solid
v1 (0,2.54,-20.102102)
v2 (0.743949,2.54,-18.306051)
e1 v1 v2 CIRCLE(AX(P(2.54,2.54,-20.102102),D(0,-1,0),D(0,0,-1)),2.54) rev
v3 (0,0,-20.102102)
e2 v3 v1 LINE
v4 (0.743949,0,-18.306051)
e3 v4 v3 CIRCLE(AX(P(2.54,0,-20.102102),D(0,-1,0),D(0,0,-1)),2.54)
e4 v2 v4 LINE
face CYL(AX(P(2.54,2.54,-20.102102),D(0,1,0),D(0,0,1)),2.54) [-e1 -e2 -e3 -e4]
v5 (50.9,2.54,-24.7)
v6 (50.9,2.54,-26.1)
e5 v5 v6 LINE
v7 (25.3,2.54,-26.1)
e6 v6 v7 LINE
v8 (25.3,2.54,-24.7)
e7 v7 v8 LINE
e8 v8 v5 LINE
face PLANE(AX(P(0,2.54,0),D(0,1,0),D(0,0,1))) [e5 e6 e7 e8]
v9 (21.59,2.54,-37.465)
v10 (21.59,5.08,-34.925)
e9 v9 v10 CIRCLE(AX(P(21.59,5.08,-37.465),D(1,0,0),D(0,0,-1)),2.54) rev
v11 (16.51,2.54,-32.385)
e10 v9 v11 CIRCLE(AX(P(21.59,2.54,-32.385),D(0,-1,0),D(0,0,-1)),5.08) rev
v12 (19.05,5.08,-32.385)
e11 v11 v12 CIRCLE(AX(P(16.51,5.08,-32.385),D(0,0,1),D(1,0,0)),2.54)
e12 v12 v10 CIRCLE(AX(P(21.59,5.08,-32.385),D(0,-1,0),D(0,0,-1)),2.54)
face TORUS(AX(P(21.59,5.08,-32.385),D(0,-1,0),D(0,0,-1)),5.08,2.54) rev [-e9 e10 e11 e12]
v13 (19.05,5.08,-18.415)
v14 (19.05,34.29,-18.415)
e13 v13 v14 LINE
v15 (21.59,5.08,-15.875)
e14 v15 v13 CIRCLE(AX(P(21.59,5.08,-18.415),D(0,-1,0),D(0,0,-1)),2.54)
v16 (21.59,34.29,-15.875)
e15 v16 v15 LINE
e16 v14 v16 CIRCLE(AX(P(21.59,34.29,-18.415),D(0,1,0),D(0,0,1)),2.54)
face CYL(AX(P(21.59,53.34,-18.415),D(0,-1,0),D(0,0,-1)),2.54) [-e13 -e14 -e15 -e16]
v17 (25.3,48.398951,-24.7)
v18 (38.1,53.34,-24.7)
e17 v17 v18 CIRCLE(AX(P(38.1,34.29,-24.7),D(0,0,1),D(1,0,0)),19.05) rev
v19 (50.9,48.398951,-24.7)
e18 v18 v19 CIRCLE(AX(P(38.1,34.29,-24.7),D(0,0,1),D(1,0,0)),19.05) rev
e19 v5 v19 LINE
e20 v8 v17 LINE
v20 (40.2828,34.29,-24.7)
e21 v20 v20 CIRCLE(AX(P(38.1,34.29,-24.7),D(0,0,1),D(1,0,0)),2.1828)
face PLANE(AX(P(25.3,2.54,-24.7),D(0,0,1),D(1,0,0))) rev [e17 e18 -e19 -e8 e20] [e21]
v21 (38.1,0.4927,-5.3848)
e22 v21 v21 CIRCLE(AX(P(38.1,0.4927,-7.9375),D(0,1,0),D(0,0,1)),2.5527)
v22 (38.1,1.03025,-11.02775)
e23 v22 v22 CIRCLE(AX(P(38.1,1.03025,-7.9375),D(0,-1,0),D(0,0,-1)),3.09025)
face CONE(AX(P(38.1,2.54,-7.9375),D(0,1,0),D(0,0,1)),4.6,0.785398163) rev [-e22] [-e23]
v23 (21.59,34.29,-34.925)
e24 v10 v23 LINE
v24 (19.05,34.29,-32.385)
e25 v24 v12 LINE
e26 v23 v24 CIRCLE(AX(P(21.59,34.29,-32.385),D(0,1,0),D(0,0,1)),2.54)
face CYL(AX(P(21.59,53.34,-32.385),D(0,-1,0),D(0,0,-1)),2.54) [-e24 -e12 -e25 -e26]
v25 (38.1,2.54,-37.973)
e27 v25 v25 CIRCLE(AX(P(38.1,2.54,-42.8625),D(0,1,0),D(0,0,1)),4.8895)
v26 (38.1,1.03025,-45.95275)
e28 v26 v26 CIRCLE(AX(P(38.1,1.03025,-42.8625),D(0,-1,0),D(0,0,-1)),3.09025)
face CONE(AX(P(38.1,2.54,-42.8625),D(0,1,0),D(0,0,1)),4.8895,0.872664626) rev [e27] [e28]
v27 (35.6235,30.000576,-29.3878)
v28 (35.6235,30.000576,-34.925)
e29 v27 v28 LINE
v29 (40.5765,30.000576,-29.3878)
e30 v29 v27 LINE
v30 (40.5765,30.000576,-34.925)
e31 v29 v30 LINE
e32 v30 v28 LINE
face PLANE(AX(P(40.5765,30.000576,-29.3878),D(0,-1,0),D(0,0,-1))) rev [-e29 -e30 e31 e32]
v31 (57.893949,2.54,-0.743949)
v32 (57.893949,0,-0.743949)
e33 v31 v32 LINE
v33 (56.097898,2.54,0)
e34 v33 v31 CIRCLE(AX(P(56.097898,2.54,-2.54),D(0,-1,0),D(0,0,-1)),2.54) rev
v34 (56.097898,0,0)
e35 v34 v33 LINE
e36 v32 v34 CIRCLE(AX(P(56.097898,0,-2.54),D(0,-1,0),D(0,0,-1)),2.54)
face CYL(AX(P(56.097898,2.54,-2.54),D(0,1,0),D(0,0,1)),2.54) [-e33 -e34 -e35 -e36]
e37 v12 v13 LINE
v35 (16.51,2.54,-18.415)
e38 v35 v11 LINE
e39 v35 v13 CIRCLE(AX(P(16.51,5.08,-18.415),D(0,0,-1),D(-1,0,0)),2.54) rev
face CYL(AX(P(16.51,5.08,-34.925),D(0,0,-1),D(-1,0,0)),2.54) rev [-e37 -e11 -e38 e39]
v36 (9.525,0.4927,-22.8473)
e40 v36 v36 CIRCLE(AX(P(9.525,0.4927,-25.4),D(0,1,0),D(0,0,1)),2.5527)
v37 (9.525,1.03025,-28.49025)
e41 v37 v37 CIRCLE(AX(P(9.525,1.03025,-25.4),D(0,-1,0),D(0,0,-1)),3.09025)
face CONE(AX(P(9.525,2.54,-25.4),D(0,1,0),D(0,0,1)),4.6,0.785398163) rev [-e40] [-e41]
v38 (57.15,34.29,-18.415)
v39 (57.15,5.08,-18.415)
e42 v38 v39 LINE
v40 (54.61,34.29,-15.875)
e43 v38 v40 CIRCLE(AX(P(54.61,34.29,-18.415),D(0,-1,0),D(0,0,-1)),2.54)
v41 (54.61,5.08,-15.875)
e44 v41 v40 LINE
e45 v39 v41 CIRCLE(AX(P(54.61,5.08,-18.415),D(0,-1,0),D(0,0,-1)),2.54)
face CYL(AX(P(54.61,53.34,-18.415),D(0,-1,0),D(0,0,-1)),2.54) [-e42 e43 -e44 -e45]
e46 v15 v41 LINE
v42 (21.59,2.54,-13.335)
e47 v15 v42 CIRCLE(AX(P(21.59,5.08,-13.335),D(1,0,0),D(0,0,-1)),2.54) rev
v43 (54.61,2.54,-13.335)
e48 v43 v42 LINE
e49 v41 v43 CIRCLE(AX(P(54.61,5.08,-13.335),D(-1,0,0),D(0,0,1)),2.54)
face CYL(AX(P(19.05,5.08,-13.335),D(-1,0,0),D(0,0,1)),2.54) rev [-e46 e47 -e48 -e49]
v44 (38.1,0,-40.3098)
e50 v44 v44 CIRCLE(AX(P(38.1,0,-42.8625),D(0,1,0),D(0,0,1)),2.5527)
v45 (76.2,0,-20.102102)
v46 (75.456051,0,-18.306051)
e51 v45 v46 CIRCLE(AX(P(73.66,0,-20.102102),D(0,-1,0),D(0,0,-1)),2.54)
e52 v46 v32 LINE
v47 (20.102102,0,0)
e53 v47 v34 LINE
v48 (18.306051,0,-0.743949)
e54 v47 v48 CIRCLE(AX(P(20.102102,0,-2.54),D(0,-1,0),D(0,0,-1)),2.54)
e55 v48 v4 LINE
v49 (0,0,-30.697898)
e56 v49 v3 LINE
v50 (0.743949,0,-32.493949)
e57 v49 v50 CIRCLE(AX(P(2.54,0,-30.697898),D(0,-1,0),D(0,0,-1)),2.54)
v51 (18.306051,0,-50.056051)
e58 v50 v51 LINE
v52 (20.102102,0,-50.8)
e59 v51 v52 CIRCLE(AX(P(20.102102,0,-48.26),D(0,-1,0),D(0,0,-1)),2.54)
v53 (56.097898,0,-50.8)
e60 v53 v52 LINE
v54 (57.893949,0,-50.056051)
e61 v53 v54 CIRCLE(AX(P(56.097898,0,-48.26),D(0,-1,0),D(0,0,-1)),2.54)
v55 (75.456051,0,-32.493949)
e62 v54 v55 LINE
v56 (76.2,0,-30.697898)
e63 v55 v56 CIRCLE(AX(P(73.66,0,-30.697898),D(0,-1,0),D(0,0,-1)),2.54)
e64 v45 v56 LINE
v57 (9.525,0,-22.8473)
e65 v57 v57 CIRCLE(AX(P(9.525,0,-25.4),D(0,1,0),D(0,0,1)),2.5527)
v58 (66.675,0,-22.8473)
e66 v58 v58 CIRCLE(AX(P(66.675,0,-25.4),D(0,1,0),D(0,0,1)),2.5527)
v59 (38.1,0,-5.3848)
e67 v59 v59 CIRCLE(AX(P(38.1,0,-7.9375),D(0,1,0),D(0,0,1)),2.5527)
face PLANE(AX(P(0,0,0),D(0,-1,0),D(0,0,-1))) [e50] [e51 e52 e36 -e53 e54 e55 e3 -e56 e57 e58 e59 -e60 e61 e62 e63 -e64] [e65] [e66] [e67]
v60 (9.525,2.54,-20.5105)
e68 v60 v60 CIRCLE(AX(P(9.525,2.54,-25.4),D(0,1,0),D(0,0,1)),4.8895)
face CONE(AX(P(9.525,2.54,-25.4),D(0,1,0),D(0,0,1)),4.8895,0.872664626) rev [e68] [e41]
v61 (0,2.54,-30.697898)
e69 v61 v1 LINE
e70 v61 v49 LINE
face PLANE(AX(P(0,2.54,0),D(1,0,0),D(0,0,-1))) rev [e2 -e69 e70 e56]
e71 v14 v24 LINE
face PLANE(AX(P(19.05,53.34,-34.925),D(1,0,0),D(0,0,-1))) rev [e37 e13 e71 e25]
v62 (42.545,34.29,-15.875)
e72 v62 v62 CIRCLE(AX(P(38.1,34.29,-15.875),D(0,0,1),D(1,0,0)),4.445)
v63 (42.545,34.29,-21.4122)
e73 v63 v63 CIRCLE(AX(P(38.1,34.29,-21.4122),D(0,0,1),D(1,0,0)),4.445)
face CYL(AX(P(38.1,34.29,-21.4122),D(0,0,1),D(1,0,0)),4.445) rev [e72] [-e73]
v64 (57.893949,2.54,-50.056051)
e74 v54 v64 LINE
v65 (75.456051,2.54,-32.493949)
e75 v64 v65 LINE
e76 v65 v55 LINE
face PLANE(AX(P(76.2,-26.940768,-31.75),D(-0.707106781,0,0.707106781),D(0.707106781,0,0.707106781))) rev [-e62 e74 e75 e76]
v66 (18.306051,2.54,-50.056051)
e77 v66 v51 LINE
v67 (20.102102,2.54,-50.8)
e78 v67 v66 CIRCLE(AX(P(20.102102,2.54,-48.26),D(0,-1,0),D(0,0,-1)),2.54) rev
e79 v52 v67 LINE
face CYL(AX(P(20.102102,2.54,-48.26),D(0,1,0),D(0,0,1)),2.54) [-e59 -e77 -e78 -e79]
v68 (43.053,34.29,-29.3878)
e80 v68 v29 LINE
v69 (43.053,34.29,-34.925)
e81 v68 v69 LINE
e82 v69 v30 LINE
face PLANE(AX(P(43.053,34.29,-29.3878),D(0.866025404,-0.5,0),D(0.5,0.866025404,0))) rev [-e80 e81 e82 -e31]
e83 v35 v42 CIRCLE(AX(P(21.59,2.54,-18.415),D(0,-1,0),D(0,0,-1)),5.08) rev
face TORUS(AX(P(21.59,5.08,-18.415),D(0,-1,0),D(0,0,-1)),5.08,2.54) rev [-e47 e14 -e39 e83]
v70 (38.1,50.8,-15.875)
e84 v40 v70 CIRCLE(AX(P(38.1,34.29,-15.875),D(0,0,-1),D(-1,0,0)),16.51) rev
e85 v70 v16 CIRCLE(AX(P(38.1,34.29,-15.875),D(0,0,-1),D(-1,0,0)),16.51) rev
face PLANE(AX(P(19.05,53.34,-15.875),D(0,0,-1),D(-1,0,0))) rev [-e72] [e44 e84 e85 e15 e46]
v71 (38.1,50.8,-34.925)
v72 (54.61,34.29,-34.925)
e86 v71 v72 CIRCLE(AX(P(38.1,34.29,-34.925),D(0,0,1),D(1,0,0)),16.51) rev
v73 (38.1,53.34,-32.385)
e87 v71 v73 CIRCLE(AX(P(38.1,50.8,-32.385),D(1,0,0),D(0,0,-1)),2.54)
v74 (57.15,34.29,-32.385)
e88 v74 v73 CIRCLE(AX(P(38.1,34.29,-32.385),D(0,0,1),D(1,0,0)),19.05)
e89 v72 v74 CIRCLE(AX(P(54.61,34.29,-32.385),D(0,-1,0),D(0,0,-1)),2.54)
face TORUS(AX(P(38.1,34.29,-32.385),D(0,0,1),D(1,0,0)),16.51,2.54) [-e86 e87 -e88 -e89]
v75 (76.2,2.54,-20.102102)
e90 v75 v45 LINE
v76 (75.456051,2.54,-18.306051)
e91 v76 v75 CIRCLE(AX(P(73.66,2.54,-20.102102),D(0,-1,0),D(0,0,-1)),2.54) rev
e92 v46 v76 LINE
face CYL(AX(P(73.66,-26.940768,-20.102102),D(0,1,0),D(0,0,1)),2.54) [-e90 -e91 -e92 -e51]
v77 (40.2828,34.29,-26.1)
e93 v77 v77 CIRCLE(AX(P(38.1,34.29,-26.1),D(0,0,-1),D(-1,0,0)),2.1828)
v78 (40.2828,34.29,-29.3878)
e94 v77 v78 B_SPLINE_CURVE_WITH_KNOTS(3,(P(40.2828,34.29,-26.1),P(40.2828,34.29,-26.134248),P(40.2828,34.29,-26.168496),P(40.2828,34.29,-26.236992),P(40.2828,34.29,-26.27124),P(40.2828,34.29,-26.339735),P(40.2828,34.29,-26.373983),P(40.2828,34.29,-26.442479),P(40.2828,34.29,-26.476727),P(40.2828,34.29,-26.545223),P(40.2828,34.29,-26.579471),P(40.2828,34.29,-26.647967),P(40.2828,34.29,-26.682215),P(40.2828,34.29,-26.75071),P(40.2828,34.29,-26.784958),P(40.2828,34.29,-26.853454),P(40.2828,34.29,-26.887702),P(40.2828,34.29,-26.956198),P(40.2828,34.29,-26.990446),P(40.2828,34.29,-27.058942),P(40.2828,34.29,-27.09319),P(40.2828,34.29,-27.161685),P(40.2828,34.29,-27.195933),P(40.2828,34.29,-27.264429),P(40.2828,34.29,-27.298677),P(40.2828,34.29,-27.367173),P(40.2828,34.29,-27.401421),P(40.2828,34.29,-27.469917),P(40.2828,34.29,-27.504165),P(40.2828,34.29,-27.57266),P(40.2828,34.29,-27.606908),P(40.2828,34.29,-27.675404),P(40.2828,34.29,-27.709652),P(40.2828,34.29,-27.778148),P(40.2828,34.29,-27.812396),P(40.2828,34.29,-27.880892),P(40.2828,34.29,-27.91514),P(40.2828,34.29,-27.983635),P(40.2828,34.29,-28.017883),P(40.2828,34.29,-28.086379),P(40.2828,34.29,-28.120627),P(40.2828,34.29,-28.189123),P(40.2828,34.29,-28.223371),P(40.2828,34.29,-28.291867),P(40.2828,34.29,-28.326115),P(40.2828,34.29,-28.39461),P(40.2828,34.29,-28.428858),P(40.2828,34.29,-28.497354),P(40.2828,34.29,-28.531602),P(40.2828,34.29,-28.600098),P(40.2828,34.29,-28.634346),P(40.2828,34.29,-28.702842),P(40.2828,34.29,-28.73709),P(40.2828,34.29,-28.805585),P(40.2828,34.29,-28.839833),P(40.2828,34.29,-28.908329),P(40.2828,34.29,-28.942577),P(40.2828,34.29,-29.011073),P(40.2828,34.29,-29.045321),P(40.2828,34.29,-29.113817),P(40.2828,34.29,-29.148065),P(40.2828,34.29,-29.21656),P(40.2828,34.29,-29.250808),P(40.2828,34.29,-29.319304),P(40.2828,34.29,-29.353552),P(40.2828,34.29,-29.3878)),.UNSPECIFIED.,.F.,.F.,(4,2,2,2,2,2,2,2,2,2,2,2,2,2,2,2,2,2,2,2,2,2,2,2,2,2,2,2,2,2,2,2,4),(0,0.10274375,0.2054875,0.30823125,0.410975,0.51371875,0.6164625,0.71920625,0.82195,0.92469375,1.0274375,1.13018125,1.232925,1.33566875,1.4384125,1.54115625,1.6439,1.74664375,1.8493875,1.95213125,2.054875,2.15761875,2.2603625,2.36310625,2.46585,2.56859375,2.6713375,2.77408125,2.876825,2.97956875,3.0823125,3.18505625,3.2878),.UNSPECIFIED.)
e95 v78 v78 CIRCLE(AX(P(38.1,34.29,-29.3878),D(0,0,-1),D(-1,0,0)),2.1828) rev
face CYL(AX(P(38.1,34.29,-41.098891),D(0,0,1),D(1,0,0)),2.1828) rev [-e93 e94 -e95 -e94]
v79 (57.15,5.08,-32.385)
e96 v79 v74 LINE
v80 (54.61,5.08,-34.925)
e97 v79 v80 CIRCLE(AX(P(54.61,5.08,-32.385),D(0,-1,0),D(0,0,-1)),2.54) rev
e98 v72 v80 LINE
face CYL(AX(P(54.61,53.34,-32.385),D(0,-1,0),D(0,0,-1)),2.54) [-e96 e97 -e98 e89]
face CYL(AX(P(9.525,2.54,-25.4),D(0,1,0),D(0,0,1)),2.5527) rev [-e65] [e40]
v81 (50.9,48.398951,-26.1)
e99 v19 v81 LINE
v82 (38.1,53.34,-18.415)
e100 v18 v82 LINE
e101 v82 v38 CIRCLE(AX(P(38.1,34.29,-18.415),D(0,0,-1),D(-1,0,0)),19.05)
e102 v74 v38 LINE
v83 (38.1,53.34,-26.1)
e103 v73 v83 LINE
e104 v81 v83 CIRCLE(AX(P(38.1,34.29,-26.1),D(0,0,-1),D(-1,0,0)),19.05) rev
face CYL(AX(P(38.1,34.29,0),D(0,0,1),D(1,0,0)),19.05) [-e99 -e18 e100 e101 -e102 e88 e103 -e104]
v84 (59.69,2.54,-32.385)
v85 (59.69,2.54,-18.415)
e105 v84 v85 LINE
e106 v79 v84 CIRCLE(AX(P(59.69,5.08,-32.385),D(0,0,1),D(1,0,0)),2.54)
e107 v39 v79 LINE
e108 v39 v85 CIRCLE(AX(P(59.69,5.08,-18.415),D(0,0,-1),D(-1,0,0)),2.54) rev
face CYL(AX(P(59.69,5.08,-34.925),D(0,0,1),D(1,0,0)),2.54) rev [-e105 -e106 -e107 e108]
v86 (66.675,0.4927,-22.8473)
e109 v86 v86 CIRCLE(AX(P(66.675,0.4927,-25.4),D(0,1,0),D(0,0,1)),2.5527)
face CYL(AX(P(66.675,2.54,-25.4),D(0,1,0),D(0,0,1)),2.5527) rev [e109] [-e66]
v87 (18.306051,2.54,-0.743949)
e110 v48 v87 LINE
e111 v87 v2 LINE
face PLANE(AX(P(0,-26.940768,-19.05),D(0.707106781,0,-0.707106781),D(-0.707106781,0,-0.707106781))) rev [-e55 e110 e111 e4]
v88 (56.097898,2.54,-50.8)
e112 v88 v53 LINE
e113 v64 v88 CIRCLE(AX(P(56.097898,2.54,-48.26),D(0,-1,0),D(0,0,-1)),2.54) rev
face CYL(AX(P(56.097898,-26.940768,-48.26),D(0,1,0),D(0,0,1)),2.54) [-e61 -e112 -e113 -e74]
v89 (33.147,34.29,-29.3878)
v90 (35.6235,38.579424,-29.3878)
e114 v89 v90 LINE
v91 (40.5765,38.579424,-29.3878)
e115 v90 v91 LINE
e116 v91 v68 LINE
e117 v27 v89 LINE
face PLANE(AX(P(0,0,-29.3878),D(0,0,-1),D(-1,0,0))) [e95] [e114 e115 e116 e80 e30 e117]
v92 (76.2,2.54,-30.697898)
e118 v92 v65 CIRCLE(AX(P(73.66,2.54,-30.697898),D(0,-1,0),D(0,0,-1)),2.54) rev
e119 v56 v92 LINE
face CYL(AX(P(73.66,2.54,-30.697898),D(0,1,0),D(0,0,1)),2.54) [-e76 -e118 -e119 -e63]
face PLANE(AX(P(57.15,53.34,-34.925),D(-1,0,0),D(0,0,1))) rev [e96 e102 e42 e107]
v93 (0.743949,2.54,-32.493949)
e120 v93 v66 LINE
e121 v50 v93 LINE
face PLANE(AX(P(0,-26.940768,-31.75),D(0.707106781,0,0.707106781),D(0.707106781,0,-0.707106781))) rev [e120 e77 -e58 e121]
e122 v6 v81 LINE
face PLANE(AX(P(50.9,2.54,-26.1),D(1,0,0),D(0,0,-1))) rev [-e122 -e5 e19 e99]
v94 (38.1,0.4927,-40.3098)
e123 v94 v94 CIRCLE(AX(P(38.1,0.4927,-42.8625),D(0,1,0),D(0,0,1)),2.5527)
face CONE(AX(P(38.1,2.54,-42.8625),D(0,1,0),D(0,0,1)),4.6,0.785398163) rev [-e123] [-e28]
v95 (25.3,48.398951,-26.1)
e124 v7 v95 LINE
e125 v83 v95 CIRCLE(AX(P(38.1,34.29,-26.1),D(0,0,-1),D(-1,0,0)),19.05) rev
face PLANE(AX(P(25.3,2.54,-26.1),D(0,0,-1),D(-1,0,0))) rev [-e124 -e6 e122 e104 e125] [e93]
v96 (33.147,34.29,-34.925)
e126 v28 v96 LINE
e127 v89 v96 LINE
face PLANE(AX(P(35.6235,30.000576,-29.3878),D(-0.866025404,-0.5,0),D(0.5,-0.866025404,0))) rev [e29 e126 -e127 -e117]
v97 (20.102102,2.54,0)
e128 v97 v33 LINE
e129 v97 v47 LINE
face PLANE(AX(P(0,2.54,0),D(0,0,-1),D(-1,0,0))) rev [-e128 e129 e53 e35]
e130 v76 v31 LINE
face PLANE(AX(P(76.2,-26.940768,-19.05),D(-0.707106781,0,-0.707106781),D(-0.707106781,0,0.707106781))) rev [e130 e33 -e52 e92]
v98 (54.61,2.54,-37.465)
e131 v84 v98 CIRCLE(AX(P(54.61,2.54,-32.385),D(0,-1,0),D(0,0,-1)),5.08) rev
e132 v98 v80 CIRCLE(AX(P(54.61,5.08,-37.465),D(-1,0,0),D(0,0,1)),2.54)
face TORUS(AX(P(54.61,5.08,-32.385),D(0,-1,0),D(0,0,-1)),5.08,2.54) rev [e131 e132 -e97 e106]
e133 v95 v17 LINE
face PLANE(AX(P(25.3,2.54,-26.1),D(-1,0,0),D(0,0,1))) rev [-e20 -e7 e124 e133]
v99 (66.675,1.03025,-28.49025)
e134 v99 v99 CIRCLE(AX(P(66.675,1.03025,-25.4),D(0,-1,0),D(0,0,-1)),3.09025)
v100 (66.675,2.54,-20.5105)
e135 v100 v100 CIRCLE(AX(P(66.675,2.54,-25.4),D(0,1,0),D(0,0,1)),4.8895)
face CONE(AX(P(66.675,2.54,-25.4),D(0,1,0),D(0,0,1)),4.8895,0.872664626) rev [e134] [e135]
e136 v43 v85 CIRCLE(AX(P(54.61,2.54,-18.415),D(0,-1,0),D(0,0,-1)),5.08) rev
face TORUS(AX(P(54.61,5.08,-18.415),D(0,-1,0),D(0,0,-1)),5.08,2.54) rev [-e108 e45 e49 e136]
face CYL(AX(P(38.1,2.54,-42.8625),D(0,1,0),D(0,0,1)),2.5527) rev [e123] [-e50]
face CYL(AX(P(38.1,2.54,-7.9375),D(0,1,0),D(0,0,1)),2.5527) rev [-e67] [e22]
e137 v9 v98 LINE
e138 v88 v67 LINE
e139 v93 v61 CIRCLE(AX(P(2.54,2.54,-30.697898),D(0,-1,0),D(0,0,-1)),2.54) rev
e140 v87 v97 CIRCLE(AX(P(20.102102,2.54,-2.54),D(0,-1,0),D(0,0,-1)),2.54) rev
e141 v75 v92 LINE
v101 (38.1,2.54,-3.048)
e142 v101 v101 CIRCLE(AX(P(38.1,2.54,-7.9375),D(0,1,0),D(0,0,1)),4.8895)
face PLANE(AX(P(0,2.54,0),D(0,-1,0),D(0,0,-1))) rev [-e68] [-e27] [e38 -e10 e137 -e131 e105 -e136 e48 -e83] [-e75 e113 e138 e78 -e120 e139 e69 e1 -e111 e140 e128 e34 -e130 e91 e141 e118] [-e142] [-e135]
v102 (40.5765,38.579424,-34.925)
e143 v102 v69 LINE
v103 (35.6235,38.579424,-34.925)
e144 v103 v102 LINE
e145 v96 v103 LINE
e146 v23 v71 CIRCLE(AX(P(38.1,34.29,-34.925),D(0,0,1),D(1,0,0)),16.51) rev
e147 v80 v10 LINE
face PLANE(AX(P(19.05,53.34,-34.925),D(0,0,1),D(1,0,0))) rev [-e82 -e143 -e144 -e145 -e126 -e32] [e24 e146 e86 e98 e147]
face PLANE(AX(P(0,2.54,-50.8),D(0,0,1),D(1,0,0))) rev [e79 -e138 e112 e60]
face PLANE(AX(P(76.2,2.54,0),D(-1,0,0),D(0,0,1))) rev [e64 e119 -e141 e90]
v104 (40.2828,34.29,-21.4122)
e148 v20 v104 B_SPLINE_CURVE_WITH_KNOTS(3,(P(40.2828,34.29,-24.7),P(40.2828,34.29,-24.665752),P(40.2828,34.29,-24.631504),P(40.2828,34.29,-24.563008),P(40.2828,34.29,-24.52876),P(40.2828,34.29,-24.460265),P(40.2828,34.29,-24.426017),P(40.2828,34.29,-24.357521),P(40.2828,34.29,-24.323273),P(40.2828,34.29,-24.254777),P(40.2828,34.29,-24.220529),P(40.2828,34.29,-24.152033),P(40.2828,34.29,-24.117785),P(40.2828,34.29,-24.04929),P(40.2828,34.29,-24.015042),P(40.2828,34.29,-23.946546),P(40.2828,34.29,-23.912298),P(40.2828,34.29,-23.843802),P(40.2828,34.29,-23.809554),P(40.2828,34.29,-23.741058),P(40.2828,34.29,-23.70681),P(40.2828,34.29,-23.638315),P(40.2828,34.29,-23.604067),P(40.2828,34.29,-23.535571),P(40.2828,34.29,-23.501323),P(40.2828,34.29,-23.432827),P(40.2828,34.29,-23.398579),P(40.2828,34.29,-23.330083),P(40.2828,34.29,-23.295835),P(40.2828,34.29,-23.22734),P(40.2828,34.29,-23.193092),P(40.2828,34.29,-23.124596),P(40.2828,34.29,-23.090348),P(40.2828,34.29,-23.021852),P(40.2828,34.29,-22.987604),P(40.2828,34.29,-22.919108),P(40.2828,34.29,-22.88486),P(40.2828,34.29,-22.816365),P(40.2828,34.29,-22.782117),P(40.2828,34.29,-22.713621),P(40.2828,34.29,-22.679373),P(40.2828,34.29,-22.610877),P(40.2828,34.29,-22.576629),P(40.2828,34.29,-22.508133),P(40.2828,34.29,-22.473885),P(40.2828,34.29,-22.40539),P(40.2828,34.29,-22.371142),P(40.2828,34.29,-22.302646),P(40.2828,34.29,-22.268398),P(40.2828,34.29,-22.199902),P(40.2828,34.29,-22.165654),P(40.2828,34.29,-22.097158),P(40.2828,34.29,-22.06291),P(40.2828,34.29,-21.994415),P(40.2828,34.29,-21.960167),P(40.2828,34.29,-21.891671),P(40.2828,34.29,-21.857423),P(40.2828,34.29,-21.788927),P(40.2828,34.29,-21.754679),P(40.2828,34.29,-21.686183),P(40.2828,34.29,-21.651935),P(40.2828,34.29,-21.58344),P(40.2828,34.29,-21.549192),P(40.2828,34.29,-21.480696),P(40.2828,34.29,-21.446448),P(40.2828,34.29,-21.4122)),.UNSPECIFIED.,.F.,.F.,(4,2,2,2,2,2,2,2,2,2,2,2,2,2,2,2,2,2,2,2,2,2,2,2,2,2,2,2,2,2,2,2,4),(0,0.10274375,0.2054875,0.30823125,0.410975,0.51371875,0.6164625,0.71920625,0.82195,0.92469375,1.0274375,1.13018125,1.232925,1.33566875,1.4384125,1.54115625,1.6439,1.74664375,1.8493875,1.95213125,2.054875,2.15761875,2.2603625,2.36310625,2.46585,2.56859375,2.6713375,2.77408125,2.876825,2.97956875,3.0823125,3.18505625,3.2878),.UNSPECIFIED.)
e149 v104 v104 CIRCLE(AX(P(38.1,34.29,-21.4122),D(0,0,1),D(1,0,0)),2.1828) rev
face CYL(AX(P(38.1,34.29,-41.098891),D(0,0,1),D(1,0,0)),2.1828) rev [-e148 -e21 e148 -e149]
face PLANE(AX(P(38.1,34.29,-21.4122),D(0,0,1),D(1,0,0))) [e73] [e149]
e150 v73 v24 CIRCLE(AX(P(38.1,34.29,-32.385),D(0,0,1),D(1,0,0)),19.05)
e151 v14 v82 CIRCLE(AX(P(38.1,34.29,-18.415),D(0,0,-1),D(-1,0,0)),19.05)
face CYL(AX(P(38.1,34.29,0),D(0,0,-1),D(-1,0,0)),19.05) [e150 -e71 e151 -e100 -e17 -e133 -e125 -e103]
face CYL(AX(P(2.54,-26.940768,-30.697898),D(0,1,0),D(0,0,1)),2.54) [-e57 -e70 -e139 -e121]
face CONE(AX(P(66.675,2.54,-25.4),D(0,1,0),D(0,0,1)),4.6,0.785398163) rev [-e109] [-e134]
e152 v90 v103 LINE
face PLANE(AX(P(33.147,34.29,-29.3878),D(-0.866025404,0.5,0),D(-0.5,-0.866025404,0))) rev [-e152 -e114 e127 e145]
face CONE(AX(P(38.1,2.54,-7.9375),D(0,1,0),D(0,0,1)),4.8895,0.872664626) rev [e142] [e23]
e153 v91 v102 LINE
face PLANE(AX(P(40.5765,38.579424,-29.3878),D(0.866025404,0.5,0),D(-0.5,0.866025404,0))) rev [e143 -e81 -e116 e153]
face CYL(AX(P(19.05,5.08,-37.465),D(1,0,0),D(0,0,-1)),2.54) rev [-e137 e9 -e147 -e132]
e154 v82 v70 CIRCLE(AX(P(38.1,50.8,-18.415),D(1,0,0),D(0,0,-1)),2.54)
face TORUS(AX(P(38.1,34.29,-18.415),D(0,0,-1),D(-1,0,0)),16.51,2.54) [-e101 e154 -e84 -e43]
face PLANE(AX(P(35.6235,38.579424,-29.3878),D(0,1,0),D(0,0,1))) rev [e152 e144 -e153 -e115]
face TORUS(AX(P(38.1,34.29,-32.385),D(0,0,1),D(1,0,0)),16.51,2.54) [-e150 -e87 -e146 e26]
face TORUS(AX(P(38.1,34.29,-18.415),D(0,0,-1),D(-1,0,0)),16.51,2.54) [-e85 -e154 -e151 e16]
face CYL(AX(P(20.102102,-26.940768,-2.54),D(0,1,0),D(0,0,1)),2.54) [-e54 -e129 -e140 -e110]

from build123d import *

# Parameters (mm, degrees)
MAIN_BASE_DIM_W                            = 76.2
MAIN_BASE_DIM_H                            = 50.8
MAIN_BASE_DEPTH                            = 2.54
LINKAGE_HOLDER_DIM_W                       = 38.1
LINKAGE_HOLDER_DIM_H                       = 19.05
LINKAGE_HOLDER_DEPTH                       = 50.8
LINKAGE_SLOT_DIM_W                         = 25.6
LINKAGE_SLOT_DIM_H                         = 1.4
LINKAGE_SLOT_DEPTH                         = 50.8
F_75IN_FILLET_R                            = 19.05
BOLT_HOLE_REACH                            = 101.355
BOLT_HOLE_DIM_R                            = 2.1828
BOLT_HEAD_DIM_R                            = 4.445
BOLT_HEAD_DEPTH                            = 5.5372
NUT_SLOT_DEPTH                             = 5.5372
CSK_FOR_10_FLAT_HEAD_MACHINE_SCREW_2_COUNT = 2
CSK_FOR_10_FLAT_HEAD_MACHINE_SCREW_2_PITCH = 33.488349187
CSK_FOR_10_FLAT_HEAD_MACHINE_SCREW_3_COUNT = 2
CSK_FOR_10_FLAT_HEAD_MACHINE_SCREW_3_PITCH = 57.15
CSK_FOR_10_FLAT_HEAD_MACHINE_SCREW_4_COUNT = 2
CSK_FOR_10_FLAT_HEAD_MACHINE_SCREW_4_PITCH = 33.488349187
CORNER_CUT_DEPTH                           = 2.54
F_1IN_FILLET_R                             = 2.54


with BuildPart() as part:
    # Main_Base_Dim → Main_Base (new body)
    with BuildSketch(Plane(origin=(0, 0, 0), x_dir=(1, 0, 0), z_dir=(0, 1, 0))):
        with Locations((38.1, 25.4)):
            Rectangle(MAIN_BASE_DIM_W, MAIN_BASE_DIM_H)
    extrude(amount=MAIN_BASE_DEPTH)

    # Linkage_Holder_Dim → Linkage_Holder (add)
    with BuildSketch(Plane(origin=(0, 2.54, 0), x_dir=(1, 0, 0), z_dir=(0, 1, 0))):
        with Locations((38.1, 25.4)):
            Rectangle(LINKAGE_HOLDER_DIM_W, LINKAGE_HOLDER_DIM_H)
    extrude(amount=LINKAGE_HOLDER_DEPTH)

    # Linkage_Slot_Dim → Linkage_Slot (cut)
    with BuildSketch(Plane(origin=(0, 53.34, 0), x_dir=(1, 0, 0), z_dir=(0, 1, 0))):
        with Locations((38.1, 25.4)):
            Rectangle(LINKAGE_SLOT_DIM_W, LINKAGE_SLOT_DIM_H)
    extrude(amount=-LINKAGE_SLOT_DEPTH, mode=Mode.SUBTRACT)

    # .75in_Fillet
    # the kernel refuses this fillet: 19.05 mm, written as the material it takes off along each edge
    with BuildSketch(Plane(origin=(57.15, 53.34, -82.55), x_dir=(0, -1, 0), z_dir=(0, 0, 1)), Plane(origin=(19.05, 53.34, 31.75), x_dir=(0, -1, 0), z_dir=(0, 0, -1))) as f_75in_fillet_piece_1:
        with BuildLine():
            CenterArc((F_75IN_FILLET_R, -F_75IN_FILLET_R), F_75IN_FILLET_R, 90, 90)
            Line((0, -F_75IN_FILLET_R), (0, 0))
            Line((0, 0), (F_75IN_FILLET_R, 0))
        make_face()
    extrude(amount=114.3, mode=Mode.SUBTRACT)

    # Bolt_Hole: up to this face of the body (flat: up to its plane)
    bolt_hole_end = Plane(part.part.faces().sort_by_distance((38.1, 26.089428348, -34.925))[0])
    # Bolt_Hole_Dim → Bolt_Hole (cut, up to the picked face)
    with BuildSketch(Plane.XY.offset(-15.875), mode=Mode.PRIVATE) as bolt_hole_sk1:
        with Locations((38.1, 34.29)):
            Circle(BOLT_HOLE_DIM_R)
    bolt_hole_tool1 = split(extrude(bolt_hole_sk1.sketch, amount=-BOLT_HOLE_REACH, mode=Mode.PRIVATE), bisect_by=bolt_hole_end, keep=Keep.BOTH, mode=Mode.PRIVATE)
    add(bolt_hole_tool1.solids().sort_by(Axis((38.1, 34.29, -15.875), (0, 0, -1)))[0], mode=Mode.SUBTRACT)

    # Bolt_Head_Dim → Bolt_Head (cut)
    with BuildSketch(Plane.XY.offset(-15.875)):
        with Locations((38.1, 34.29)):
            Circle(BOLT_HEAD_DIM_R)
    extrude(amount=-BOLT_HEAD_DEPTH, mode=Mode.SUBTRACT)

    # Nut_Slot_Dim → Nut_Slot (cut)
    with BuildSketch(Plane(origin=(0, 0, -34.925), x_dir=(-1, 0, 0), z_dir=(0, 0, -1))):
        Polygon((-35.6235, 38.579423825), (-40.5765, 38.579423825), (-43.053, 34.29), (-40.5765, 30.000576175), (-35.6235, 30.000576175), (-33.147, 34.29), align=None)
    extrude(amount=-NUT_SLOT_DEPTH, mode=Mode.SUBTRACT)

    # Sketch9 → CSK for #10 Flat Head Machine Screw (100)1 (revolve, cut)
    with BuildSketch(Plane(origin=(9.525, 2.54, -25.4), x_dir=(0, 0, 1), z_dir=(1, 0, 0))):
        Polygon((0, 0), (0, 2.54), (2.5527, 2.54), (2.5527, 1.960808018), (4.8895, 0), align=None)
    csk_for_10_flat_head_machine_screw_100 = revolve(axis=Axis((9.525, 8.89, -25.4), (0, -1, 0)), mode=Mode.SUBTRACT)

    # CSK for _10 Flat Head Machine Screw  2: CSK for #10 Flat Head Machine Screw (100)1 ×2
    with Locations(*[Vector(0.8532818336519591, 0, -0.5214500094539748) * (i * CSK_FOR_10_FLAT_HEAD_MACHINE_SCREW_2_PITCH) for i in range(1, CSK_FOR_10_FLAT_HEAD_MACHINE_SCREW_2_COUNT)]):
        add(csk_for_10_flat_head_machine_screw_100, mode=Mode.SUBTRACT)

    # CSK for _10 Flat Head Machine Screw  3: CSK for #10 Flat Head Machine Screw (100)1 ×2
    with Locations(*[(i * CSK_FOR_10_FLAT_HEAD_MACHINE_SCREW_3_PITCH, 0, 0) for i in range(1, CSK_FOR_10_FLAT_HEAD_MACHINE_SCREW_3_COUNT)]):
        add(csk_for_10_flat_head_machine_screw_100, mode=Mode.SUBTRACT)

    # CSK for _10 Flat Head Machine Screw  4: CSK for #10 Flat Head Machine Screw (100)1 ×2
    with Locations(*[Vector(0.853281833651959, 0, 0.521450009453975) * (i * CSK_FOR_10_FLAT_HEAD_MACHINE_SCREW_4_PITCH) for i in range(1, CSK_FOR_10_FLAT_HEAD_MACHINE_SCREW_4_COUNT)]):
        add(csk_for_10_flat_head_machine_screw_100, mode=Mode.SUBTRACT)

    # Screw_Hole cone 1 section (through the dimple's axis) → Screw_Hole (revolve, cut)
    with BuildSketch(Plane(origin=(9.525, 2.54, -25.4), x_dir=(0, 0, 1), z_dir=(1, 0, 0))):
        Polygon((0, 0), (4.6, 0), (0, 4.6), align=None)
    revolve(axis=Axis((9.525, 2.54, -25.4), (0, -1, 0)), mode=Mode.SUBTRACT)

    # Screw_Hole cone 2 section (through the dimple's axis) → Screw_Hole cone 2 (revolve, cut)
    with BuildSketch(Plane(origin=(38.1, 2.54, -42.8625), x_dir=(0, 0, 1), z_dir=(1, 0, 0))):
        Polygon((0, 0), (4.6, 0), (0, 4.6), align=None)
    revolve(axis=Axis((38.1, 2.54, -42.8625), (0, -1, 0)), mode=Mode.SUBTRACT)

    # Screw_Hole cone 3 section (through the dimple's axis) → Screw_Hole cone 3 (revolve, cut)
    with BuildSketch(Plane(origin=(66.675, 2.54, -25.4), x_dir=(0, 0, 1), z_dir=(1, 0, 0))):
        Polygon((0, 0), (4.6, 0), (0, 4.6), align=None)
    revolve(axis=Axis((66.675, 2.54, -25.4), (0, -1, 0)), mode=Mode.SUBTRACT)

    # Screw_Hole cone 4 section (through the dimple's axis) → Screw_Hole cone 4 (revolve, cut)
    with BuildSketch(Plane(origin=(38.1, 2.54, -7.9375), x_dir=(0, 0, 1), z_dir=(1, 0, 0))):
        Polygon((0, 0), (4.6, 0), (0, 4.6), align=None)
    revolve(axis=Axis((38.1, 2.54, -7.9375), (0, -1, 0)), mode=Mode.SUBTRACT)

    # Corner_Cut_Dim → Corner_Cut (cut)
    with BuildSketch(Plane(origin=(0, 2.54, 0), x_dir=(1, 0, 0), z_dir=(0, 1, 0))):
        Polygon((0, 0), (0, 19.05), (19.05, 0), align=None)
        Polygon((76.2, 0), (76.2, 19.05), (57.15, 0), align=None)
        Polygon((76.2, 50.8), (76.2, 31.75), (57.15, 50.8), align=None)
        Polygon((0, 31.75), (19.05, 50.8), (0, 50.8), align=None)
    extrude(amount=-CORNER_CUT_DEPTH, mode=Mode.SUBTRACT)

    # .1in_Fillet
    f_1in_fillet_edges = [part.edges().sort_by_distance(p)[0] for p in [
        (19.05, 2.54, -25.4),
        (19.05, 1.27, -50.8),
        (0, 1.27, -31.75),
        (38.1, 2.54, -15.875),
        (76.2, 1.27, -31.75),
        (57.15, 1.27, -50.8),
        (57.15, 2.54, -25.4),
        (76.2, 1.27, -19.05),
        (57.15, 1.27, 0),
        (38.1, 2.54, -34.925),
        (0, 1.27, -19.05),
        (19.05, 1.27, 0),
        (19.05, 18.415, -34.925),
        (57.15, 18.415, -34.925),
        (38.1, 53.34, -34.925),
        (38.1, 53.34, -34.925),
        (57.15, 18.415, -15.875),
        (19.05, 18.415, -15.875),
        (38.1, 53.34, -15.875),
        (38.1, 53.34, -15.875),
    ]]
    fillet(f_1in_fillet_edges, radius=F_1IN_FILLET_R)


solid = part.part
